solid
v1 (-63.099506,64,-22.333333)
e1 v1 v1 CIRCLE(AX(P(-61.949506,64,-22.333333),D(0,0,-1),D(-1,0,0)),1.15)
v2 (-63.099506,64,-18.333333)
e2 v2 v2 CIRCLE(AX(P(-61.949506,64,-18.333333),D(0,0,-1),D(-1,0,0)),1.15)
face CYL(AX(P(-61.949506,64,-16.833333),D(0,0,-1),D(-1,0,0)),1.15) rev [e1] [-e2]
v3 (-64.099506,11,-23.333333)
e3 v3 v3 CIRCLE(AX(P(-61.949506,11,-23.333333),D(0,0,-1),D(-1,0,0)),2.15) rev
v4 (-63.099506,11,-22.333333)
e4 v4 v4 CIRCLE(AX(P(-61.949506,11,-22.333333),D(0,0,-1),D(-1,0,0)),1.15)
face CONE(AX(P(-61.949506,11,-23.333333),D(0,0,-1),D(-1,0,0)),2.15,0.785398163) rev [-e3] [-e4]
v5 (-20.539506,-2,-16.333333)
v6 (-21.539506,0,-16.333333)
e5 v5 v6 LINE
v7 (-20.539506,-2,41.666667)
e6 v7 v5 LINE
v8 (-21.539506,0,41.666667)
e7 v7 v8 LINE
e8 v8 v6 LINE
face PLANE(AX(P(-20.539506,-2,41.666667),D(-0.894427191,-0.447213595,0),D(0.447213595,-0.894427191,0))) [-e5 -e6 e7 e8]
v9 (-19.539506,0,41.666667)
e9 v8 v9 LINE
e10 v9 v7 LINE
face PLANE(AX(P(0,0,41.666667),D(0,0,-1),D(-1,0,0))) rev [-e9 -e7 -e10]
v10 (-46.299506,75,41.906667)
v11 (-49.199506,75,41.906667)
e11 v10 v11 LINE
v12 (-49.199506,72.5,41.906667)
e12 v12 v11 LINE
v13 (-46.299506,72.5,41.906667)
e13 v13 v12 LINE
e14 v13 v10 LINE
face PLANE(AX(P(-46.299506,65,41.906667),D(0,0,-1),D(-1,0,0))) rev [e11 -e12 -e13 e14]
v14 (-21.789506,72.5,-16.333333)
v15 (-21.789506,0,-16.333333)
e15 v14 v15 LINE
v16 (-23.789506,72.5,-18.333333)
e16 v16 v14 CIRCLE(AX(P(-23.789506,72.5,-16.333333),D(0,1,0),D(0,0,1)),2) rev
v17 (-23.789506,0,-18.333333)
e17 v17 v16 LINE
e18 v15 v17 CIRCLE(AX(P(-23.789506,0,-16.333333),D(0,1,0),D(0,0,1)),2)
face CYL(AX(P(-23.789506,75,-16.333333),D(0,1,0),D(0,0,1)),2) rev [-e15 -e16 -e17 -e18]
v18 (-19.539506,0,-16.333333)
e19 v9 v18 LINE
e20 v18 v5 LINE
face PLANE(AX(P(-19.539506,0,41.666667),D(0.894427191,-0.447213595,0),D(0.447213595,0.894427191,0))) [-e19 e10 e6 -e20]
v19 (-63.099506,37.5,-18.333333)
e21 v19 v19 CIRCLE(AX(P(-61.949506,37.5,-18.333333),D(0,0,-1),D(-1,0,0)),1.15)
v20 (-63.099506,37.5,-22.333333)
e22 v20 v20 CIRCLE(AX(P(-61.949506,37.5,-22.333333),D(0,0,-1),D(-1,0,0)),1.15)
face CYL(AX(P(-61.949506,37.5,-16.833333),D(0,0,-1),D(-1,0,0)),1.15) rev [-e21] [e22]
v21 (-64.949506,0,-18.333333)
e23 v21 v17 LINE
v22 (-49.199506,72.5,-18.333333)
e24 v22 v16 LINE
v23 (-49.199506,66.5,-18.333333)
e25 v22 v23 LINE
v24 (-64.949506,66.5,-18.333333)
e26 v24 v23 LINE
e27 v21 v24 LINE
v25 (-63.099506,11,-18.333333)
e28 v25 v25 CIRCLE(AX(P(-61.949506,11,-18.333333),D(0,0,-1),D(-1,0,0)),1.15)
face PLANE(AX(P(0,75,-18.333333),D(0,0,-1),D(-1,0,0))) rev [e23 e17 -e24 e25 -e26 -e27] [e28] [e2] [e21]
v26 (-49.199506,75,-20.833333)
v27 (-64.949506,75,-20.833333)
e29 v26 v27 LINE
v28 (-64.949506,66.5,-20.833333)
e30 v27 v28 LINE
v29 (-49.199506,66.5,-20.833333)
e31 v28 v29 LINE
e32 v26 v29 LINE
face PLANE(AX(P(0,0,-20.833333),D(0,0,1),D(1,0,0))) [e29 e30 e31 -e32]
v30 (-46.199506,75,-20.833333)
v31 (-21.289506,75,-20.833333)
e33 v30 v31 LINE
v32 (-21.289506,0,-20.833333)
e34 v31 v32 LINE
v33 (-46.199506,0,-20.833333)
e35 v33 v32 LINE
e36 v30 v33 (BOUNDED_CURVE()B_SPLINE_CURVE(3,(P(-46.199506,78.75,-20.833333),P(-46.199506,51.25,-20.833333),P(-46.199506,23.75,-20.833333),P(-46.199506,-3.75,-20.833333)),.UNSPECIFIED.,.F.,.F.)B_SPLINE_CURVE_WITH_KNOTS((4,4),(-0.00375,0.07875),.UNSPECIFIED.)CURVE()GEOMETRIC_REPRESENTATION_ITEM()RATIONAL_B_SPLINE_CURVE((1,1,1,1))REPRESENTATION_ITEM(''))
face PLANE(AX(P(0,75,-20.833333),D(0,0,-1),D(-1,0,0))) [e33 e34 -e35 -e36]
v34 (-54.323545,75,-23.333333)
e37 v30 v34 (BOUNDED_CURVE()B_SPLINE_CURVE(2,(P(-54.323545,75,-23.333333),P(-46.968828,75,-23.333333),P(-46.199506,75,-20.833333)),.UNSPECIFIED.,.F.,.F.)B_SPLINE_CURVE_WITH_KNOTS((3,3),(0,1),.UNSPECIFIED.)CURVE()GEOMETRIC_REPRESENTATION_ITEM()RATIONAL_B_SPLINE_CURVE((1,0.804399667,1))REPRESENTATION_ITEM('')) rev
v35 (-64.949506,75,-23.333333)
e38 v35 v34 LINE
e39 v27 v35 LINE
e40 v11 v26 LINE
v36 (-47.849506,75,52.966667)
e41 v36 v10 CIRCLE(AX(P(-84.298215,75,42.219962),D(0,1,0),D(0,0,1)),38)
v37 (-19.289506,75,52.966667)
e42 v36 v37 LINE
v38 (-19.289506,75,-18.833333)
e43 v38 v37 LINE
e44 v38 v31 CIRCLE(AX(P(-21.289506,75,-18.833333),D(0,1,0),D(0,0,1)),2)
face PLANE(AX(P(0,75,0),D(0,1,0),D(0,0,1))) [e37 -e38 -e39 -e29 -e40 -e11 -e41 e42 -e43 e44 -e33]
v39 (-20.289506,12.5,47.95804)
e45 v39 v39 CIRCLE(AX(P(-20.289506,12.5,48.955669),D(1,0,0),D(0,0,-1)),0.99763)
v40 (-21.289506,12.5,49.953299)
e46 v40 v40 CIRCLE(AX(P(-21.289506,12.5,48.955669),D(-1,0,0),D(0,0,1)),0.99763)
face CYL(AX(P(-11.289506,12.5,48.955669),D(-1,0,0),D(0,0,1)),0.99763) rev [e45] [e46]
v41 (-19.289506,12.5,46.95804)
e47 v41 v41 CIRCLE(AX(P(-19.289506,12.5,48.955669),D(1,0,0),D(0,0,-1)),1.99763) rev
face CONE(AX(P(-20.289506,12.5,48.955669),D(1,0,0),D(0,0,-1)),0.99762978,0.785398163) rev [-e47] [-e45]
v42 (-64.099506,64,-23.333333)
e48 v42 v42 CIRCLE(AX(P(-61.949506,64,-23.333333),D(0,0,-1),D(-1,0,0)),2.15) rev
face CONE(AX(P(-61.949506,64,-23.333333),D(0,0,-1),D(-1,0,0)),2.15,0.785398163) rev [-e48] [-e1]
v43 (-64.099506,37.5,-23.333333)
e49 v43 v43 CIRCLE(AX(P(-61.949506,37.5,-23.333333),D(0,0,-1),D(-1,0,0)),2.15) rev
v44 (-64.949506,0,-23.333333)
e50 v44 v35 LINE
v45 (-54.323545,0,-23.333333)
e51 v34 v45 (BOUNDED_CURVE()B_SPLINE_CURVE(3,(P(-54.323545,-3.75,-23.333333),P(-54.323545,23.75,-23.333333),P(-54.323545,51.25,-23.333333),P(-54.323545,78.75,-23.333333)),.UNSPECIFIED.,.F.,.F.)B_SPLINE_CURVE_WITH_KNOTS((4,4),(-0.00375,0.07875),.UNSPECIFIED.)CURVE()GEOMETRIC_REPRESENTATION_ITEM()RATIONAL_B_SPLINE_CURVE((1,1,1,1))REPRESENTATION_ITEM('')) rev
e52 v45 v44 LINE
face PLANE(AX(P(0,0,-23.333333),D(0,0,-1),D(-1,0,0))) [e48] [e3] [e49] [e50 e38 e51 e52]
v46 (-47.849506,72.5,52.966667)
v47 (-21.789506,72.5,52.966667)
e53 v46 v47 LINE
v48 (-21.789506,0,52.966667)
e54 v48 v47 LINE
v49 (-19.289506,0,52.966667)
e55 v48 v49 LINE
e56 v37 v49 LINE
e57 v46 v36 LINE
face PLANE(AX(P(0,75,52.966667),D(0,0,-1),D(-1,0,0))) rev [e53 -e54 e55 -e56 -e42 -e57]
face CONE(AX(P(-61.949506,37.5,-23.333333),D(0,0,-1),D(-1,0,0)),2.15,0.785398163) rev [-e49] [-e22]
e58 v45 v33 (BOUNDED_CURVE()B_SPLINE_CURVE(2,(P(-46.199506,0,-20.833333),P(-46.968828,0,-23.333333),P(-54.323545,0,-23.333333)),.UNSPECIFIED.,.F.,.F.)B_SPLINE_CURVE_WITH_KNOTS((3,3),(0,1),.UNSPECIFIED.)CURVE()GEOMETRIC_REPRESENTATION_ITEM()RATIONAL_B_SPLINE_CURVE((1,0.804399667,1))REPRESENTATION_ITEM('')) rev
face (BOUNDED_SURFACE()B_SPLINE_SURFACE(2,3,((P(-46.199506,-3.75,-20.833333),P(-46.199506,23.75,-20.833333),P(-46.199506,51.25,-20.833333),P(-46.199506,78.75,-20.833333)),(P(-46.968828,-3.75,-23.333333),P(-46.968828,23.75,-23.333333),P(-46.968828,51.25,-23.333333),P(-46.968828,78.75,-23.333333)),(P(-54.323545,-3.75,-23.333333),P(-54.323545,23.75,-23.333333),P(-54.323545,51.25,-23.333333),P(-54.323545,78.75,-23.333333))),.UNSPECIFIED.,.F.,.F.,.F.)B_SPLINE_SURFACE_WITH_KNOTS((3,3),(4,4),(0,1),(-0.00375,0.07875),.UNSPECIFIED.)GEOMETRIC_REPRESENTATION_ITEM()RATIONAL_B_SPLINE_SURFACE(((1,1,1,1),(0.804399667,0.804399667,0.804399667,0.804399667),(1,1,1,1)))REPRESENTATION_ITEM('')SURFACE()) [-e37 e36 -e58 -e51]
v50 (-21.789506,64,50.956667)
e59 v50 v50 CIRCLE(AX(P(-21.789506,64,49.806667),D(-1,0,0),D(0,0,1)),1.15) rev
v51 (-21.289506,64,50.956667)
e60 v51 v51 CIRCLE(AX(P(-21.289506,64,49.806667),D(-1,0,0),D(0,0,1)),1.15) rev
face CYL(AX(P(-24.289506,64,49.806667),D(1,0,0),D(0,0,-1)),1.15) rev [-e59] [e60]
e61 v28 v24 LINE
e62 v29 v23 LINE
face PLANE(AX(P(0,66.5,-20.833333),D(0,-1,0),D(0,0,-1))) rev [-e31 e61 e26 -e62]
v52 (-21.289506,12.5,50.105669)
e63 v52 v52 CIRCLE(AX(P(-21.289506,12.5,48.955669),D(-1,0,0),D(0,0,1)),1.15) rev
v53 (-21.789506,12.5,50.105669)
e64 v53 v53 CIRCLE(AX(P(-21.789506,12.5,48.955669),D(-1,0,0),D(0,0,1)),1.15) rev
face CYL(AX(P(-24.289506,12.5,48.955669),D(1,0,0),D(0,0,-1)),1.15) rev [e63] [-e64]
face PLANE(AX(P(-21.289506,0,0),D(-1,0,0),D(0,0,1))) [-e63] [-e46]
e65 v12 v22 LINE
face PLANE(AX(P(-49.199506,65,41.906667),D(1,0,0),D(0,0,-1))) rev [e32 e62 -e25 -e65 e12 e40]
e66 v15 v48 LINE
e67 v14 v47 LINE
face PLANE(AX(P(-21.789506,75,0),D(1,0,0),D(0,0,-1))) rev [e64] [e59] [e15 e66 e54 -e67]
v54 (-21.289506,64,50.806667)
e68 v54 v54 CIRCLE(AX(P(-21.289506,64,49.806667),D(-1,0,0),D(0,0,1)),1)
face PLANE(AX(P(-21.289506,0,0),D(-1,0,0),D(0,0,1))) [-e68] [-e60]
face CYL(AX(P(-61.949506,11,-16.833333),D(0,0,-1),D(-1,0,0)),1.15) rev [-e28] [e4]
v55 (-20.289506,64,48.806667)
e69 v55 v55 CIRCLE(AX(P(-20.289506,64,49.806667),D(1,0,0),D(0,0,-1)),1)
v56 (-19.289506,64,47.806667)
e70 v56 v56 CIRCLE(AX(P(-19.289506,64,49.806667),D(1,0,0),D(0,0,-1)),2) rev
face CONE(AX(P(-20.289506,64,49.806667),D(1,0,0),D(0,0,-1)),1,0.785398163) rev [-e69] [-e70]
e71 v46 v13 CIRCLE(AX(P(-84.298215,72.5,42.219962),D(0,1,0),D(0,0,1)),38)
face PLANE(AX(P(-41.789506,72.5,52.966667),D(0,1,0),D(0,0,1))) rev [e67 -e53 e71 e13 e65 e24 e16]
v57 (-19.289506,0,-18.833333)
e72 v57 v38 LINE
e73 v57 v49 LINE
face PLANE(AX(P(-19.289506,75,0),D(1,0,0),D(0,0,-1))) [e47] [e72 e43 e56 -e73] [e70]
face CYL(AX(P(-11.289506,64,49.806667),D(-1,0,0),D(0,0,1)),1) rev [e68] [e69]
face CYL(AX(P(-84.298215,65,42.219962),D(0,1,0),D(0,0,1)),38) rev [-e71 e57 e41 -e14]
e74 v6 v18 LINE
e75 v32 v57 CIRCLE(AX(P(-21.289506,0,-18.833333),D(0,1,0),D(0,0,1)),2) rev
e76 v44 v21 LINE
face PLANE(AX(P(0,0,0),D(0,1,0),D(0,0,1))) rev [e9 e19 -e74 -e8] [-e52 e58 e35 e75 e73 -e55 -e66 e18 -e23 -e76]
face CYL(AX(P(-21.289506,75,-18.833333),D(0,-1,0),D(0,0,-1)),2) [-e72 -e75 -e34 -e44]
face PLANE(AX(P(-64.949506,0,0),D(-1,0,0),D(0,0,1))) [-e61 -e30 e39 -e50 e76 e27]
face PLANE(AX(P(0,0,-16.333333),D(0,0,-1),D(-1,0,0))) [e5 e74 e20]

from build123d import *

# Parameters (mm, degrees)
BOSS_EXTRUDE1_DEPTH = 75
FILLET1_R           = 2
SKETCH4_R           = 1.15
CUT_EXTRUDE2_DEPTH  = 5
BOSS_EXTRUDE2_DEPTH = 58
SKETCH7_W           = 12
SKETCH7_H           = 80
CUT_EXTRUDE3_DEPTH  = 5
SKETCH8_W           = 2.5
SKETCH8_H           = 75
BOSS_EXTRUDE3_DEPTH = 20
SKETCH10_W          = 71.647703853
SKETCH10_H          = 2.5
BOSS_EXTRUDE4_DEPTH = 20
SKETCH12_W          = 3.098039447
SKETCH12_H          = 2.1077236
CUT_EXTRUDE4_DEPTH  = 58
SKETCH13_W          = 11.16
SKETCH13_H          = 75
BOSS_EXTRUDE6_DEPTH = 2
SKETCH14_R          = 1
SKETCH14_R_2        = 0.99762978
CUT_EXTRUDE5_DEPTH  = 10
CHAMFER2_SIZE       = 1
SKETCH16_W          = 2.5
SKETCH16_H          = 75
BOSS_EXTRUDE7_DEPTH = 10
SKETCH17_W          = 71.3
SKETCH17_H          = 2.5
BOSS_EXTRUDE8_DEPTH = 10
SKETCH18_R          = 1.15
CUT_EXTRUDE7_DEPTH  = 4
CUT_EXTRUDE8_DEPTH  = 10
BOSS_EXTRUDE9_START = 2.5
SKETCH21_W          = 18.75
SKETCH21_H          = 75
SKETCH21_R          = 1.15
BOSS_EXTRUDE9_DEPTH = 2.5
CUT_EXTRUDE10_DEPTH = 2.5
CHAMFER3_SIZE       = 1
FILLET2_START       = -1
FILLET2_DEPTH       = 77


with BuildPart() as part:
    # Sketch1 → Boss-Extrude1 (new body)
    with BuildSketch(Plane(origin=(0, 0, 0), x_dir=(1, 0, 0), z_dir=(0, 1, 0))):
        with BuildLine():
            Line((-23.765673143, -52.966666667), (-21.11640892, -52.966666667))
            ThreePointArc((-21.11640892, -52.966666667), (-19.749251579, -47.460938782), (-19.289506454, -41.806666667))
            Line((-19.289506454, -41.806666667), (-19.289506454, 18.333333333))
            Line((-19.289506454, 18.333333333), (-19.289506454, 20.833333333))
            Line((-19.289506454, 20.833333333), (-34.949506454, 20.833333333))
            Line((-34.949506454, 20.833333333), (-34.949506454, 18.333333333))
            Line((-34.949506454, 18.333333333), (-21.789506454, 18.333333333))
            Line((-21.789506454, 18.333333333), (-21.789506454, -41.806666667))
            ThreePointArc((-21.789506454, -41.806666667), (-22.287361349, -47.473474295), (-23.765673143, -52.966666667))
        make_face()
    extrude(amount=BOSS_EXTRUDE1_DEPTH)

    # Fillet1
    fillet1_edges = [part.edges().sort_by_distance(p)[0] for p in [
        (-21.789506454, 37.5, -18.333333333),
        (-19.289506454, 37.5, -20.833333333),
    ]]
    fillet(fillet1_edges, radius=FILLET1_R)

    # Sketch4 → Cut-Extrude2 (cut)
    with BuildSketch(Plane(origin=(-19.289506454, 0, 0), x_dir=(0, 0, -1), z_dir=(1, 0, 0))):
        with Locations((-49.806666667, 64)):
            Circle(SKETCH4_R)
        with Locations((-48.955669454, 12.5)):
            Circle(SKETCH4_R)
    extrude(amount=-CUT_EXTRUDE2_DEPTH, mode=Mode.SUBTRACT)

    # Sketch6 → Boss-Extrude2 (add)
    with BuildSketch(Plane(origin=(0, 0, -16.333333333), x_dir=(-1, 0, 0), z_dir=(0, 0, -1))):
        Polygon((19.539506454, 75), (21.539506454, 75), (20.48442105, 77), align=None)
        Polygon((21.539506454, 0), (19.539506454, 0), (20.539506454, -2), align=None)
    extrude(amount=-BOSS_EXTRUDE2_DEPTH)

    # Sketch7 → Cut-Extrude3 (cut)
    with BuildSketch(Plane.ZY.offset(21.789506454)):
        with Locations((47.806666667, 35)):
            Rectangle(SKETCH7_W, SKETCH7_H)
    extrude(amount=CUT_EXTRUDE3_DEPTH, mode=Mode.SUBTRACT)

    # Sketch8 → Boss-Extrude3 (add)
    with BuildSketch(Plane.ZY.offset(34.949506454)):
        with Locations((-19.583333333, 37.5)):
            Rectangle(SKETCH8_W, SKETCH8_H)
    extrude(amount=BOSS_EXTRUDE3_DEPTH)

    # Sketch10 → Boss-Extrude4 (add)
    with BuildSketch(Plane.ZY.offset(21.789506454)):
        with Locations((17.142814741, 73.75)):
            Rectangle(SKETCH10_W, SKETCH10_H)
    extrude(amount=BOSS_EXTRUDE4_DEPTH)

    # Sketch12 → Cut-Extrude4 (cut)
    with BuildSketch(Plane(origin=(0, 0, -16.333333333), x_dir=(-1, 0, 0), z_dir=(0, 0, -1))):
        with Locations((20.374958132, 76.0538618)):
            Rectangle(SKETCH12_W, SKETCH12_H)
    extrude(amount=-CUT_EXTRUDE4_DEPTH, mode=Mode.SUBTRACT)

    # Sketch13 → Boss-Extrude6 (add)
    with BuildSketch(Plane(origin=(-19.289506454, 0, 0), x_dir=(0, 0, -1), z_dir=(1, 0, 0))):
        with Locations((-47.386666667, 37.5)):
            Rectangle(SKETCH13_W, SKETCH13_H)
    extrude(amount=-BOSS_EXTRUDE6_DEPTH)

    # Sketch14 → Cut-Extrude5 (cut)
    with BuildSketch(Plane.ZY.offset(21.289506454)):
        with Locations((49.806666667, 64)):
            Circle(SKETCH14_R)
        with Locations((48.955669454, 12.5)):
            Circle(SKETCH14_R_2)
    extrude(amount=-CUT_EXTRUDE5_DEPTH, mode=Mode.SUBTRACT)

    # Chamfer2
    chamfer2_edges = [part.edges().sort_by_distance(p)[0] for p in [
        (-19.289506454, 64, 48.806666667),
        (-19.289506454, 12.5, 47.958039674),
    ]]
    chamfer(chamfer2_edges, length=CHAMFER2_SIZE)

    # Sketch16 → Boss-Extrude7 (add)
    with BuildSketch(Plane.ZY.offset(54.949506454)):
        with Locations((-19.583333333, 37.5)):
            Rectangle(SKETCH16_W, SKETCH16_H)
    extrude(amount=BOSS_EXTRUDE7_DEPTH)

    # Sketch17 → Boss-Extrude8 (add)
    with BuildSketch(Plane.ZY.offset(41.789506454)):
        with Locations((17.316666667, 73.75)):
            Rectangle(SKETCH17_W, SKETCH17_H)
    extrude(amount=BOSS_EXTRUDE8_DEPTH)

    # Sketch18 → Cut-Extrude7 (cut)
    with BuildSketch(Plane(origin=(0, 0, -20.833333333), x_dir=(-1, 0, 0), z_dir=(0, 0, -1))):
        with Locations((61.949506454, 64)):
            Circle(SKETCH18_R)
        with Locations((61.949506454, 37.5)):
            Circle(SKETCH18_R)
        with Locations((61.949506454, 11)):
            Circle(SKETCH18_R)
    extrude(amount=-CUT_EXTRUDE7_DEPTH, mode=Mode.SUBTRACT)

    # Sketch20 → Cut-Extrude8 (cut)
    with BuildSketch(Plane(origin=(0, 75, 0), x_dir=(1, 0, 0), z_dir=(0, 1, 0))):
        with BuildLine():
            Line((-46.299506454, -41.906666667), (-49.199506454, -41.906666667))
            Line((-49.199506454, -41.906666667), (-49.199506454, 18.333333333))
            Line((-49.199506454, 18.333333333), (-51.789506454, 18.333333333))
            Line((-51.789506454, 18.333333333), (-51.789506454, -52.966666667))
            Line((-51.789506454, -52.966666667), (-47.849506454, -52.966666667))
            ThreePointArc((-47.849506454, -52.966666667), (-46.665976454, -47.493919967), (-46.299506454, -41.906666667))
        make_face()
    extrude(amount=-CUT_EXTRUDE8_DEPTH, mode=Mode.SUBTRACT)

    # Sketch21 → Boss-Extrude9 (add)
    with BuildSketch(Plane(origin=(0, 0, -20.833333333), x_dir=(-1, 0, 0), z_dir=(0, 0, -1)).offset(BOSS_EXTRUDE9_START)):
        with Locations((55.574506454, 37.5)):
            Rectangle(SKETCH21_W, SKETCH21_H)
        with Locations((61.949506454, 11)):
            Circle(SKETCH21_R, mode=Mode.SUBTRACT)
        with Locations((61.949506454, 37.5)):
            Circle(SKETCH21_R, mode=Mode.SUBTRACT)
        with Locations((61.949506454, 64)):
            Circle(SKETCH21_R, mode=Mode.SUBTRACT)
    extrude(amount=-BOSS_EXTRUDE9_DEPTH)

    # Sketch22 → Cut-Extrude10 (cut)
    with BuildSketch(Plane.XY.offset(-18.333333333)):
        Polygon((-49.199506454, 66.5), (-49.199506454, 72.5), (-49.199506454, 75), (-64.949506454, 75), (-64.949506454, 66.5), align=None)
    extrude(amount=-CUT_EXTRUDE10_DEPTH, mode=Mode.SUBTRACT)

    # Chamfer3
    chamfer3_edges = [part.edges().sort_by_distance(p)[0] for p in [
        (-60.799506454, 37.5, -23.333333333),
        (-60.799506454, 11, -23.333333333),
        (-60.799506454, 64, -23.333333333),
    ]]
    chamfer(chamfer3_edges, length=CHAMFER3_SIZE)

    # Fillet2: read off the stored shape, not the designer's step
    # Fillet2 outline → Fillet2 (cut)
    with BuildSketch(Plane(origin=(0, 0, 0), x_dir=(1, 0, 0), z_dir=(0, 1, 0)).offset(FILLET2_START)):
        with BuildLine():
            add(Edge.make_bspline(
                [(-46.199506454, 20.833333333), (-46.968828273, 23.333333333), (-54.323544859, 23.333333333)],
                knots=[0, 0, 0, 1, 1, 1], degree=2, weights=[1, 0.804399667, 1]))
            Line((-46.199506454, 20.833333333), (-46.199506454, 23.333333333))
            Line((-46.199506454, 23.333333333), (-54.323544859, 23.333333333))
        make_face()
    extrude(amount=FILLET2_DEPTH, mode=Mode.SUBTRACT)


solid = part.part
